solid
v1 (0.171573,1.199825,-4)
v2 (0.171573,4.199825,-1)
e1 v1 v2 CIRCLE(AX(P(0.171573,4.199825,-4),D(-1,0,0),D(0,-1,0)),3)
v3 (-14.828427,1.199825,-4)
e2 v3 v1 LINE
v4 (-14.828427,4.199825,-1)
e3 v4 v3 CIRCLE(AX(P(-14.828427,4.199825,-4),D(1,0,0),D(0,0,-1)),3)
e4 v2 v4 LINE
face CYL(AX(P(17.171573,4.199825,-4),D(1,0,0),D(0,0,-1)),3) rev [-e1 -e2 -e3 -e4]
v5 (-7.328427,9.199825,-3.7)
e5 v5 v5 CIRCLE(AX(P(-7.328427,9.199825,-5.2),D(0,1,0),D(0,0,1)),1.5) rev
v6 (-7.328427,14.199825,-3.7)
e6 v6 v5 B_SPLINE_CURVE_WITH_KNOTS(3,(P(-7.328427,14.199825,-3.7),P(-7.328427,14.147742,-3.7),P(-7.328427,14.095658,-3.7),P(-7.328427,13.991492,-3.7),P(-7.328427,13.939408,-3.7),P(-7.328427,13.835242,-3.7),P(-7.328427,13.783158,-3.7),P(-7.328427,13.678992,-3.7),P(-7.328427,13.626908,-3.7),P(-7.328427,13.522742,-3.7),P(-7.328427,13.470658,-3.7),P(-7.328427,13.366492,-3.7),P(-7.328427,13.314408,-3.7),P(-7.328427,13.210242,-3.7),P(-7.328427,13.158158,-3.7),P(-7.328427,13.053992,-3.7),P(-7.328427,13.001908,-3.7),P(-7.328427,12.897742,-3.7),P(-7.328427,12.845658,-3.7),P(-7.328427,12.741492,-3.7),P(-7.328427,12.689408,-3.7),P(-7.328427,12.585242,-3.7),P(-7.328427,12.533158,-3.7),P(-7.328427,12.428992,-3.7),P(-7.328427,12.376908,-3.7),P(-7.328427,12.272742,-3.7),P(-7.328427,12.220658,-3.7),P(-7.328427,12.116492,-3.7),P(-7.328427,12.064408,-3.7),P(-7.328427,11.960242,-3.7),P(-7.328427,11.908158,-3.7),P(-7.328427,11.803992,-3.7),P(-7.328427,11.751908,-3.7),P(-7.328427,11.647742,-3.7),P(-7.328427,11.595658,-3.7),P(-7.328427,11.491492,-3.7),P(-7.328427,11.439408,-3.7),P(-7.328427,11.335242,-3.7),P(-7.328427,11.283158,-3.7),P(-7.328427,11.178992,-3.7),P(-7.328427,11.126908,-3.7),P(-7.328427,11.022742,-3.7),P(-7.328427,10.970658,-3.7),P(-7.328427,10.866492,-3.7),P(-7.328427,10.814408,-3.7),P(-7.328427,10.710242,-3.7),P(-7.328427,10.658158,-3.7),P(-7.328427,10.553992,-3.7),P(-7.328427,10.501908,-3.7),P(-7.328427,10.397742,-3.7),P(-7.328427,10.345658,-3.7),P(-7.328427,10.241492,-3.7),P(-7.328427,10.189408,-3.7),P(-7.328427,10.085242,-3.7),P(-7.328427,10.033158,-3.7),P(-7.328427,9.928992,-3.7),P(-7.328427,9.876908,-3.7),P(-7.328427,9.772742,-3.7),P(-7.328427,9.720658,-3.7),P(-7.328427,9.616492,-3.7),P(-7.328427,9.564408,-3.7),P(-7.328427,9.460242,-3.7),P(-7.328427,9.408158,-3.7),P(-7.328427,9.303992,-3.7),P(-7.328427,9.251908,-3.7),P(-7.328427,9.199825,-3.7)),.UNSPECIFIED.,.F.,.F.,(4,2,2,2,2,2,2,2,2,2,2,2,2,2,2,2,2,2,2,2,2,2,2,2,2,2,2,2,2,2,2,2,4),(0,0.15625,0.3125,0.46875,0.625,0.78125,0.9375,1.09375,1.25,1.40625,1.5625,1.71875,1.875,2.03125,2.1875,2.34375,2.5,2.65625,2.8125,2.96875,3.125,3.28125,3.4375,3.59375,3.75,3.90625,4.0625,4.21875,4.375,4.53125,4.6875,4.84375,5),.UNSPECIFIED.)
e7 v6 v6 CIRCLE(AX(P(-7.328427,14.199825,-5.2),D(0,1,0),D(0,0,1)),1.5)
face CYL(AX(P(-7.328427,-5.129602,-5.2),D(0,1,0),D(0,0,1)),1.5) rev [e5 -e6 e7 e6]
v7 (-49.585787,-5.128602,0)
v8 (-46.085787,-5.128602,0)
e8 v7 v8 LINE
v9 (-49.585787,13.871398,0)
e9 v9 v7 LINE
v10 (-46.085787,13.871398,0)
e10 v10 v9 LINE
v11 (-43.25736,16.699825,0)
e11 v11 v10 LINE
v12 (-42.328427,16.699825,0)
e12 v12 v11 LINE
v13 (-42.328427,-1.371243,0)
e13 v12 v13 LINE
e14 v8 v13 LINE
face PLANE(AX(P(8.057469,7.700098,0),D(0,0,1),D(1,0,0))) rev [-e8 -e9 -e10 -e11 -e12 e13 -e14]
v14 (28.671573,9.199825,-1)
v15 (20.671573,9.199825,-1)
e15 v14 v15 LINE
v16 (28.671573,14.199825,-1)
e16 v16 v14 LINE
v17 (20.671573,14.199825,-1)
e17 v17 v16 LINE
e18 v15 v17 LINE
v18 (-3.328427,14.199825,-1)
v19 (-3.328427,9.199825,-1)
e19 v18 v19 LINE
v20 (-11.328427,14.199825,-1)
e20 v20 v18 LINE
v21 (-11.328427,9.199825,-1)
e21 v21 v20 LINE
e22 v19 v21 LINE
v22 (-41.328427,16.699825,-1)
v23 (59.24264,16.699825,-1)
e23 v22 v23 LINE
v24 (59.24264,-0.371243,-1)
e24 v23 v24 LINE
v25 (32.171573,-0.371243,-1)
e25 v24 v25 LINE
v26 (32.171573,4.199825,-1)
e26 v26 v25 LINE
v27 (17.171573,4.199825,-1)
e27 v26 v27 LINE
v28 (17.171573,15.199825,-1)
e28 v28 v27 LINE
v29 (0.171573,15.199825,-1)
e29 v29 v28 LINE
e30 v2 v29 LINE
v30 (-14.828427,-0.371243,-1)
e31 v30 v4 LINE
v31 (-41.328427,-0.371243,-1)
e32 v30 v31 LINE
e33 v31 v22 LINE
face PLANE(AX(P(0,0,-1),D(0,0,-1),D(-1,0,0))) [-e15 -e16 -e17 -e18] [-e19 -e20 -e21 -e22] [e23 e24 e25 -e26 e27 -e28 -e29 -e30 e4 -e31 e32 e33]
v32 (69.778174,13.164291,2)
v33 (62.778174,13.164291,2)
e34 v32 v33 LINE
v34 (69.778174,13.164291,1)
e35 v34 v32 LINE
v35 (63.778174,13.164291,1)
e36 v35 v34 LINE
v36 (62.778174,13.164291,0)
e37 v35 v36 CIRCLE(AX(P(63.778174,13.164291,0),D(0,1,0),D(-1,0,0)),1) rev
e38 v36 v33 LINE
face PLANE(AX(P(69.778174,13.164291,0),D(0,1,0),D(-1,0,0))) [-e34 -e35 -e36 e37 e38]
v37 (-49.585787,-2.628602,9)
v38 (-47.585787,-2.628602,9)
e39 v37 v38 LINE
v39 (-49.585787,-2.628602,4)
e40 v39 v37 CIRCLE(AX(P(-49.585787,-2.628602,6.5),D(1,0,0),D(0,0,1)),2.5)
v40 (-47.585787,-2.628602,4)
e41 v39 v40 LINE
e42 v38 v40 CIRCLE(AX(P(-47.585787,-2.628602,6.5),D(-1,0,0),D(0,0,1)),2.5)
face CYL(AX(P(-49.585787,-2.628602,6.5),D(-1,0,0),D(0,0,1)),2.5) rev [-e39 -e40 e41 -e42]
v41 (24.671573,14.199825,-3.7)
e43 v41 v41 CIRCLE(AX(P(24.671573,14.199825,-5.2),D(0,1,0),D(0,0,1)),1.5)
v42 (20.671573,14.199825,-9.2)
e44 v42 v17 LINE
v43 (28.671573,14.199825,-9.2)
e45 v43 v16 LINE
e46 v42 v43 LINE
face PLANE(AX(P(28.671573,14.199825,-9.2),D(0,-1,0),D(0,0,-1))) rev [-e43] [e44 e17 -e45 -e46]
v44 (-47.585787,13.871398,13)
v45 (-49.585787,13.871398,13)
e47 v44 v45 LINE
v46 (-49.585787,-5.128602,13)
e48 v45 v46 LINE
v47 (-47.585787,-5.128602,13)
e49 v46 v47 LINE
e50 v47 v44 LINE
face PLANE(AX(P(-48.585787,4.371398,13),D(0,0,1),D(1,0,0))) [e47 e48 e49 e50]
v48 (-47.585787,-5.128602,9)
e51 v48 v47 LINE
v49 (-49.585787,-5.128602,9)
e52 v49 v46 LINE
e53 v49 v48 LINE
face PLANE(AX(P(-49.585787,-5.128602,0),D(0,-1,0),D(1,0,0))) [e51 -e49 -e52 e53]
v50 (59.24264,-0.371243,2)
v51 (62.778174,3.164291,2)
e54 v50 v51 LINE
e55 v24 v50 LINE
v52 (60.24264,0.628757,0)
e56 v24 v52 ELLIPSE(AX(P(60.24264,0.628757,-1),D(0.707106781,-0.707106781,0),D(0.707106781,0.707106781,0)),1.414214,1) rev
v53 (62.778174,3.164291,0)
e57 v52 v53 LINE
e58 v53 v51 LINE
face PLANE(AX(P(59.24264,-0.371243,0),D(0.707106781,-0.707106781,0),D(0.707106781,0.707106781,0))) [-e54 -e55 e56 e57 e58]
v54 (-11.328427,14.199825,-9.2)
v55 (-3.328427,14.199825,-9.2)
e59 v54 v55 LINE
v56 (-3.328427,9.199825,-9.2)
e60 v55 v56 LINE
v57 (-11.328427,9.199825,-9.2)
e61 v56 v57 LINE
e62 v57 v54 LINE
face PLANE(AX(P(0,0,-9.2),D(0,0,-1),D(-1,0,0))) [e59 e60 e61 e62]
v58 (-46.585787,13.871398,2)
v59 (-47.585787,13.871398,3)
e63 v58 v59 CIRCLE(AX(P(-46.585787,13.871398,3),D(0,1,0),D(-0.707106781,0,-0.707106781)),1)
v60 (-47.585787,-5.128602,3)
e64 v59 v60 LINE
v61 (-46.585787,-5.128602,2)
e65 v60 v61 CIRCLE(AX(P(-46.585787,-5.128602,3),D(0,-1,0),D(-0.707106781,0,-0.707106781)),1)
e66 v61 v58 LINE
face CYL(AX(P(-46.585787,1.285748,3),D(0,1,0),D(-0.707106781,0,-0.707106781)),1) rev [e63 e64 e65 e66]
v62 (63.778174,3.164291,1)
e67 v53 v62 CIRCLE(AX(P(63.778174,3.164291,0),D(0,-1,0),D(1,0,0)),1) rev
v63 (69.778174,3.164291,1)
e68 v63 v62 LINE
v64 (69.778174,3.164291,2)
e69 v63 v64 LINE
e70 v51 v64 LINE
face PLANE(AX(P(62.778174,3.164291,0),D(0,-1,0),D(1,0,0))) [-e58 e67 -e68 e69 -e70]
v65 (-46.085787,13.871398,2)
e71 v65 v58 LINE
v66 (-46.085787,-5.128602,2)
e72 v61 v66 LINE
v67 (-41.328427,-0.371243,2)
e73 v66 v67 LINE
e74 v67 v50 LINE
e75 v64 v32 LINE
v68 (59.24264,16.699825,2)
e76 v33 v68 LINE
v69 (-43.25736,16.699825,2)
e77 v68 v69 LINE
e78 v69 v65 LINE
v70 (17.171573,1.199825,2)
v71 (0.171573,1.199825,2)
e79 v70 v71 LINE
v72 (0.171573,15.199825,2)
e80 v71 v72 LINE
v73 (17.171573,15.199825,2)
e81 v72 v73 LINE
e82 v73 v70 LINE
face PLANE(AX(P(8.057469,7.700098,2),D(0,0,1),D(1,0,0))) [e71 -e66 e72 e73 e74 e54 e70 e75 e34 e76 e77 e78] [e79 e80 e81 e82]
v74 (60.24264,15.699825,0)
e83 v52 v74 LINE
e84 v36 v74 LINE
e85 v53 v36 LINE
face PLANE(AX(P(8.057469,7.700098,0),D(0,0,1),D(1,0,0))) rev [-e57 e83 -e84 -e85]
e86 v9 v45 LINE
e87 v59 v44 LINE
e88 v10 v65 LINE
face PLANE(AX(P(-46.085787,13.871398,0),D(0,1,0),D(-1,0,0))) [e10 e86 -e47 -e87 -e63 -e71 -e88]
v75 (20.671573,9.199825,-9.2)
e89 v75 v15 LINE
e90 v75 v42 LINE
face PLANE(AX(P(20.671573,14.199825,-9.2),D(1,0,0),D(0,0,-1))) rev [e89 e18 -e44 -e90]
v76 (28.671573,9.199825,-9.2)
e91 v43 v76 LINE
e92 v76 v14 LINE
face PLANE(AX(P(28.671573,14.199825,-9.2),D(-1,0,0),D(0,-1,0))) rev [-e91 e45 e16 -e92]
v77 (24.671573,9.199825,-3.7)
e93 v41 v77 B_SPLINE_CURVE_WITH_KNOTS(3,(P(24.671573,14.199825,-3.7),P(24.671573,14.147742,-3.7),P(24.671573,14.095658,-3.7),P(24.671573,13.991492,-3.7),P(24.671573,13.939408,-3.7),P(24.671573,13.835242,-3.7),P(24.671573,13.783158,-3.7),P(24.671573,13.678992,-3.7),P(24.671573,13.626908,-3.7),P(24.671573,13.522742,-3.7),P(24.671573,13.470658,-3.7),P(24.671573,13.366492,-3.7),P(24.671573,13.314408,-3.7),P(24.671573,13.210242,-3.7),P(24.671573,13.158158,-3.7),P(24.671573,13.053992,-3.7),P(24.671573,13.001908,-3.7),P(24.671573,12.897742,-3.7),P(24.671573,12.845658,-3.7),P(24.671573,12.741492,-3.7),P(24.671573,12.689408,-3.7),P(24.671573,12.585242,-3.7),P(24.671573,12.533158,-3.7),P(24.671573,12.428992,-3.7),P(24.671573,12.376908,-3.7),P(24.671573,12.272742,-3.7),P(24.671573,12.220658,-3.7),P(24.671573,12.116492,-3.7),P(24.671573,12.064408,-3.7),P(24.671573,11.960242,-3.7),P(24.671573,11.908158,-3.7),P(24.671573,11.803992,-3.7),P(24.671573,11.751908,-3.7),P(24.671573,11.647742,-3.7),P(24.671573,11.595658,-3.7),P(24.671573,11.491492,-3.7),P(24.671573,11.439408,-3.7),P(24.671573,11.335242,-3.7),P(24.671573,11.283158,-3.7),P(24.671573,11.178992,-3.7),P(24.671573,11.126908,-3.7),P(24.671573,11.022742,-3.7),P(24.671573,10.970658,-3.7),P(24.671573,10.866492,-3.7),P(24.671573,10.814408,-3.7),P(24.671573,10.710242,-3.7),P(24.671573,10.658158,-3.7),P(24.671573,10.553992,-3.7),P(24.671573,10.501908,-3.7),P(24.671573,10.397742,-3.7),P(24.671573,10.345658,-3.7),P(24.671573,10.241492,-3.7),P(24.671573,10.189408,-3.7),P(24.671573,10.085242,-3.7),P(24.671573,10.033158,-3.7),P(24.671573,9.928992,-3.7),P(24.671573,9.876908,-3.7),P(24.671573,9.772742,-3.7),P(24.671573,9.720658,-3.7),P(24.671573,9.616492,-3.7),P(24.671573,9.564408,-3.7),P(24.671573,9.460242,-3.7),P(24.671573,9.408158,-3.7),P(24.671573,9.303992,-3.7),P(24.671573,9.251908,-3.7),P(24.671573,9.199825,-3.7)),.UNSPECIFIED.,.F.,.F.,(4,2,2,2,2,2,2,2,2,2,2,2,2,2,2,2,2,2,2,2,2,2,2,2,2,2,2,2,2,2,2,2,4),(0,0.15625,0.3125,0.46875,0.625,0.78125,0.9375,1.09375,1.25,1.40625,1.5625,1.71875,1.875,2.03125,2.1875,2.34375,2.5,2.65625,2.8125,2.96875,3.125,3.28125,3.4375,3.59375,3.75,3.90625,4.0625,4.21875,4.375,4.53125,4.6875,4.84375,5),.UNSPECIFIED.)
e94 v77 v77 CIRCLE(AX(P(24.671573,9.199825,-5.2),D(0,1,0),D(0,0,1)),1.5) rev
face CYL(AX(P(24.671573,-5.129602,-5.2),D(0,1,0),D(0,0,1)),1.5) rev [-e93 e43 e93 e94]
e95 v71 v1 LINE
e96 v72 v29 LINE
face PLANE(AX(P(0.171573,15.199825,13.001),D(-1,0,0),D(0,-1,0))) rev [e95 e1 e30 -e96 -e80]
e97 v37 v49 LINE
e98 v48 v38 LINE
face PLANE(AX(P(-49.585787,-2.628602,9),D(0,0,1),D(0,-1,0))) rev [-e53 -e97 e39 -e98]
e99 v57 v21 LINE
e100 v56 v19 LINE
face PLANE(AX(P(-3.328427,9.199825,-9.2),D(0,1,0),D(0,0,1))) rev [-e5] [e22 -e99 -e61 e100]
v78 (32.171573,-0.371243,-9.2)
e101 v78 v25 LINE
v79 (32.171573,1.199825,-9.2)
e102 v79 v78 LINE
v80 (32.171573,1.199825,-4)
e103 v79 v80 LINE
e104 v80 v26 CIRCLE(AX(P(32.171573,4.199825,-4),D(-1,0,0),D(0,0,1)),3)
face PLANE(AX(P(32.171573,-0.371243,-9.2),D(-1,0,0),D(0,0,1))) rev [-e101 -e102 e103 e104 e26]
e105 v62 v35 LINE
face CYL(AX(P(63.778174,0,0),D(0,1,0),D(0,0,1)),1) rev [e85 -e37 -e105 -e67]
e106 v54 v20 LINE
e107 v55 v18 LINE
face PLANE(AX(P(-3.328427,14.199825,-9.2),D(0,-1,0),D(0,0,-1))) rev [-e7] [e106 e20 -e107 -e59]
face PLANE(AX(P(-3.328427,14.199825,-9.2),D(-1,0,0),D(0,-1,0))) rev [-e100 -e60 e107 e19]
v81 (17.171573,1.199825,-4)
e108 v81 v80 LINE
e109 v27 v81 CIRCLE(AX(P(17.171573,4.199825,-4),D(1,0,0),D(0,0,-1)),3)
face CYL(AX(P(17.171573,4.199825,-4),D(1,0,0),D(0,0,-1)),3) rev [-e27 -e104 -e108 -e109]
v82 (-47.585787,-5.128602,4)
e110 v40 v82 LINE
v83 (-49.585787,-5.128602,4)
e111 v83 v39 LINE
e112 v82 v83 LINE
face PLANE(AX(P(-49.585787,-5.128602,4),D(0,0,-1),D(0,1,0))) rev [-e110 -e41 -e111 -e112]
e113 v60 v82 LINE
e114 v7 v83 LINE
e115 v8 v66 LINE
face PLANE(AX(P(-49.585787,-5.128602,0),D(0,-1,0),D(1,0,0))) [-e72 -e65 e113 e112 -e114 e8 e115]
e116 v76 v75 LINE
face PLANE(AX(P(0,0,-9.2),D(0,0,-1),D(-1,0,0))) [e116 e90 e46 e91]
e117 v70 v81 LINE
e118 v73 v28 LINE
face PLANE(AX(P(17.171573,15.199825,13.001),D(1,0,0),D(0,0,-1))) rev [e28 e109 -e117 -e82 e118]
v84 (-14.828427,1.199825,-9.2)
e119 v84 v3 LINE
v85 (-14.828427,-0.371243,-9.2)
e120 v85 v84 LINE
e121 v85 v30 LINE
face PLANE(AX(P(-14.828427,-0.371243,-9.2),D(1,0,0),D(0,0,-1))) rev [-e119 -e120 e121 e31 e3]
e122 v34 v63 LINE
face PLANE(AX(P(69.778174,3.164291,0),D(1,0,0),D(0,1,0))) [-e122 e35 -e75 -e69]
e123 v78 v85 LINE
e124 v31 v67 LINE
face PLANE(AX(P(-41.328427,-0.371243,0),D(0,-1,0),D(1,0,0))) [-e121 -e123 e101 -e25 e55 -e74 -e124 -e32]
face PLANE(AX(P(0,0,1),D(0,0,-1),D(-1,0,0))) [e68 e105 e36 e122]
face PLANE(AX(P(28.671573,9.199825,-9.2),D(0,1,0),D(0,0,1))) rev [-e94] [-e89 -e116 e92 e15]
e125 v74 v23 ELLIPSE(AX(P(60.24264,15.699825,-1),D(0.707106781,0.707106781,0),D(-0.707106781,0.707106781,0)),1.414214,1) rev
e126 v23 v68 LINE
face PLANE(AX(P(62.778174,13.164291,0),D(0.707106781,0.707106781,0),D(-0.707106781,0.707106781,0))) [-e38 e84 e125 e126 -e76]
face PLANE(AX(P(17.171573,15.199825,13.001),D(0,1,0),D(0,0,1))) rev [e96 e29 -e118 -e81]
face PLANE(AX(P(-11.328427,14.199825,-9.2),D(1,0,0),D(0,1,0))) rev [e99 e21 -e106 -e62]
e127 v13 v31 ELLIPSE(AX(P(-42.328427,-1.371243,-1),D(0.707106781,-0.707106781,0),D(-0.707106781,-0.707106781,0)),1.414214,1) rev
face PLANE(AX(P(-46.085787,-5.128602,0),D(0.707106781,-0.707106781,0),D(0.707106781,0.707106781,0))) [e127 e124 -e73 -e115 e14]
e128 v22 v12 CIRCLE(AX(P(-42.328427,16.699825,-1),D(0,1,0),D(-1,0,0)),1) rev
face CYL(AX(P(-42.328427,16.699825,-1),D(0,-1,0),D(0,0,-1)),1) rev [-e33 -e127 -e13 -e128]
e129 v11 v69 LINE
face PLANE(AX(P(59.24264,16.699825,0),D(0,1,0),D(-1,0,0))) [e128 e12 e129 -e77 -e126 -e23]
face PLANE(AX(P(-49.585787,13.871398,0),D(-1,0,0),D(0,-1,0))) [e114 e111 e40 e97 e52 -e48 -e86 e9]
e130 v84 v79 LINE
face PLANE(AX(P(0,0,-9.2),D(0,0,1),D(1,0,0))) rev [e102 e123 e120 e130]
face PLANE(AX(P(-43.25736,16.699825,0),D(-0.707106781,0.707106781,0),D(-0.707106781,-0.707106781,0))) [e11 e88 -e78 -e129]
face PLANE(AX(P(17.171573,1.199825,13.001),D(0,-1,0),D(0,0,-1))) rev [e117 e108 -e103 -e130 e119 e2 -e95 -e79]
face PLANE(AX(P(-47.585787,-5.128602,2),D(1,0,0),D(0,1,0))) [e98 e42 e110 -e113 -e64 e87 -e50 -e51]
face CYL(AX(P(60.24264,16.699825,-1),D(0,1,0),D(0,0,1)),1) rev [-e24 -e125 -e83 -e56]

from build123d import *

# Parameters (mm, degrees)
CUT_EXTRUDE_1_DEPTH       = 2
CUT_EXTRUDE_START         = 9
CUT_EXTRUDE_1_2_OUTLINE_W = 2
CUT_EXTRUDE_1_2_OUTLINE_H = 19
CUT_EXTRUDE_1_2_DEPTH     = 4
CUT_EXTRUDE_START_2       = 2
CUT_EXTRUDE_1_3_OUTLINE_W = 2
CUT_EXTRUDE_1_3_OUTLINE_H = 19
CUT_EXTRUDE_1_3_DEPTH     = 2
CUT_EXTRUDE_START_3       = -49.585786703
CUT_EXTRUDE_1_4_DEPTH     = 2
CUT_EXTRUDE_START_4       = -5.128602194
CUT_EXTRUDE_1_5_DEPTH     = 19
SKETCH_3_W                = 100.571067812
SKETCH_3_H                = 17.071067812
EXTRUDE_1_DEPTH           = 1
CUT_EXTRUDE_2_REACH       = 75.102
SKETCH_4_W                = 17
SKETCH_4_H                = 14
SKETCH_5_W                = 8
SKETCH_5_H                = 5
SKETCH_5_W_2              = 47
SKETCH_5_H_2              = 1.571067812
EXTRUDE_2_DEPTH           = 8.2
CUT_EXTRUDE_3_REACH       = 75.563
SKETCH_6_R                = 1.5
FILLET_1_R                = 1
FILLET_2_R                = 3
SKETCH_8_W                = 7
SKETCH_8_H                = 10
CUT_EXTRUDE_4_DEPTH       = 1
FILLET_3_R                = 1


with BuildPart() as part:
    # 切除-拉伸1: read off the stored shape, not the designer's step
    # 切除-拉伸1 outline → 切除-拉伸1 (new body)
    with BuildSketch(Plane.XY):
        Polygon((-49.585786703, 13.871397806), (-49.585786703, -5.128602194), (-46.085786703, -5.128602194), (-41.32842739, -0.371242882), (59.242640422, -0.371242882), (62.778174328, 3.164291024), (69.778174328, 3.164291024), (69.778174328, 13.164291024), (62.778174328, 13.164291024), (59.242640422, 16.69982493), (-43.257359578, 16.69982493), (-46.085786703, 13.871397806), align=None)
    extrude(amount=CUT_EXTRUDE_1_DEPTH)

    # Cut-Extrude 1 3 outline → Cut-Extrude 1 3 (add)
    with BuildSketch(Plane.XY.offset(CUT_EXTRUDE_START_2)):
        with Locations((-48.585786703, 4.371397806)):
            Rectangle(CUT_EXTRUDE_1_3_OUTLINE_W, CUT_EXTRUDE_1_3_OUTLINE_H)
    extrude(amount=CUT_EXTRUDE_1_3_DEPTH)



with BuildPart() as body_2:
    # Cut-Extrude 1 2 outline → Cut-Extrude 1 2 (new body)
    with BuildSketch(Plane.XY.offset(CUT_EXTRUDE_START)):
        with Locations((-48.585786703, 4.371397806)):
            Rectangle(CUT_EXTRUDE_1_2_OUTLINE_W, CUT_EXTRUDE_1_2_OUTLINE_H)
    extrude(amount=CUT_EXTRUDE_1_2_DEPTH)


with BuildPart() as part_1:
    add(part.part)

    add(body_2.part)  # Cut-Extrude 1 4 merges body 2
    # Cut-Extrude 1 4 outline → Cut-Extrude 1 4 (add)
    with BuildSketch(Plane.YZ.offset(CUT_EXTRUDE_START_3)):
        with BuildLine():
            Line((13.871397806, 9), (-2.628602194, 9))
            ThreePointArc((-2.628602194, 9), (-0.128602194, 6.5), (-2.628602194, 4))
            Line((-2.628602194, 4), (13.871397806, 4))
            Line((13.871397806, 4), (13.871397806, 9))
        make_face()
    extrude(amount=CUT_EXTRUDE_1_4_DEPTH)

    # Cut-Extrude 1 5 outline → Cut-Extrude 1 5 (add)
    with BuildSketch(Plane(origin=(0, 0, 0), x_dir=(1, 0, 0), z_dir=(0, 1, 0)).offset(CUT_EXTRUDE_START_4)):
        with BuildLine():
            ThreePointArc((-47.585786703, -3), (-47.292893484, -2.292893219), (-46.585786703, -2))
            Line((-46.585786703, -2), (-47.585786703, -2))
            Line((-47.585786703, -2), (-47.585786703, -3))
        make_face()
    extrude(amount=CUT_EXTRUDE_1_5_DEPTH)

    # 草图3 → 凸台-拉伸1 (add)
    with BuildSketch(Plane(origin=(0, 0, 0), x_dir=(-1, 0, 0), z_dir=(0, 0, -1))):
        with Locations((-8.957106516, 8.164291024)):
            Rectangle(SKETCH_3_W, SKETCH_3_H)
    extrude(amount=EXTRUDE_1_DEPTH)

    # 草图4 → 切除-拉伸2 (cut, up to next)
    with BuildSketch(Plane(origin=(0, 0, -1), x_dir=(-1, 0, 0), z_dir=(0, 0, -1)), mode=Mode.PRIVATE) as cut_extrude_2_sk1:
        with Locations((-8.67157261, 8.19982493)):
            Rectangle(SKETCH_4_W, SKETCH_4_H)
    cut_extrude_2_tool1 = extrude(cut_extrude_2_sk1.sketch, amount=-CUT_EXTRUDE_2_REACH, mode=Mode.PRIVATE) & part_1.part
    add(cut_extrude_2_tool1.solids().sort_by_distance((8.671573, 8.199825, -1))[0], mode=Mode.SUBTRACT)

    # 草图5 → 凸台-拉伸2 (add)
    with BuildSketch(Plane(origin=(0, 0, -1), x_dir=(-1, 0, 0), z_dir=(0, 0, -1))):
        with Locations((-24.67157261, 11.69982493)):
            Rectangle(SKETCH_5_W, SKETCH_5_H)
        with Locations((7.32842739, 11.69982493)):
            Rectangle(SKETCH_5_W, SKETCH_5_H)
        with Locations((-8.67157261, 0.414291024)):
            Rectangle(SKETCH_5_W_2, SKETCH_5_H_2)
    extrude(amount=EXTRUDE_2_DEPTH)

    # 草图6 → 切除-拉伸3 (cut, up to next)
    with BuildSketch(Plane(origin=(0, 14.19982493, 0), x_dir=(1, 0, 0), z_dir=(0, 1, 0)), mode=Mode.PRIVATE) as cut_extrude_3_sk1:
        with Locations(Location((-7.32842739, 5.2, 0), (0, 0, 270))):
            Circle(SKETCH_6_R)
    cut_extrude_3_tool1 = extrude(cut_extrude_3_sk1.sketch, amount=-CUT_EXTRUDE_3_REACH, mode=Mode.PRIVATE) & part_1.part
    # 草图6 → 切除-拉伸3 (cut, up to next)
    with BuildSketch(Plane(origin=(0, 14.19982493, 0), x_dir=(1, 0, 0), z_dir=(0, 1, 0)), mode=Mode.PRIVATE) as cut_extrude_3_sk2:
        with Locations(Location((24.67157261, 5.2, 0), (0, 0, 270))):
            Circle(SKETCH_6_R)
    cut_extrude_3_tool2 = extrude(cut_extrude_3_sk2.sketch, amount=-CUT_EXTRUDE_3_REACH, mode=Mode.PRIVATE) & part_1.part
    add(cut_extrude_3_tool1.solids().sort_by_distance((-7.328427, 14.199825, -5.2))[0], mode=Mode.SUBTRACT)
    add(cut_extrude_3_tool2.solids().sort_by_distance((24.671573, 14.199825, -5.2))[0], mode=Mode.SUBTRACT)

    # 圆角1
    fillet_1_edges = [part_1.edges().sort_by_distance(p)[0] for p in [
        (59.242640422, 8.164291024, 0),
        (-41.32842739, 8.164291024, 0),
    ]]
    fillet(fillet_1_edges, radius=FILLET_1_R - 0.0001)  # a hair under: the kernel refuses the full size

    # 圆角2
    fillet_2_edges = [part_1.edges().sort_by_distance(p)[0] for p in [
        (-7.32842739, 1.19982493, -1),
        (24.67157261, 1.19982493, -1),
    ]]
    fillet(fillet_2_edges, radius=FILLET_2_R)

    # 草图8 → 切除-拉伸4 (cut)
    with BuildSketch(Plane(origin=(0, 0, 0), x_dir=(-1, 0, 0), z_dir=(0, 0, -1))):
        with Locations((-66.278174328, 8.164291024)):
            Rectangle(SKETCH_8_W, SKETCH_8_H)
    extrude(amount=-CUT_EXTRUDE_4_DEPTH, mode=Mode.SUBTRACT)

    # 圆角3
    fillet_3_edges = [part_1.edges().sort_by_distance(p)[0] for p in [
        (62.778174328, 8.164291024, 1),
    ]]
    fillet(fillet_3_edges, radius=FILLET_3_R - 0.0001)  # a hair under: the kernel refuses the full size


solid = part_1.part
